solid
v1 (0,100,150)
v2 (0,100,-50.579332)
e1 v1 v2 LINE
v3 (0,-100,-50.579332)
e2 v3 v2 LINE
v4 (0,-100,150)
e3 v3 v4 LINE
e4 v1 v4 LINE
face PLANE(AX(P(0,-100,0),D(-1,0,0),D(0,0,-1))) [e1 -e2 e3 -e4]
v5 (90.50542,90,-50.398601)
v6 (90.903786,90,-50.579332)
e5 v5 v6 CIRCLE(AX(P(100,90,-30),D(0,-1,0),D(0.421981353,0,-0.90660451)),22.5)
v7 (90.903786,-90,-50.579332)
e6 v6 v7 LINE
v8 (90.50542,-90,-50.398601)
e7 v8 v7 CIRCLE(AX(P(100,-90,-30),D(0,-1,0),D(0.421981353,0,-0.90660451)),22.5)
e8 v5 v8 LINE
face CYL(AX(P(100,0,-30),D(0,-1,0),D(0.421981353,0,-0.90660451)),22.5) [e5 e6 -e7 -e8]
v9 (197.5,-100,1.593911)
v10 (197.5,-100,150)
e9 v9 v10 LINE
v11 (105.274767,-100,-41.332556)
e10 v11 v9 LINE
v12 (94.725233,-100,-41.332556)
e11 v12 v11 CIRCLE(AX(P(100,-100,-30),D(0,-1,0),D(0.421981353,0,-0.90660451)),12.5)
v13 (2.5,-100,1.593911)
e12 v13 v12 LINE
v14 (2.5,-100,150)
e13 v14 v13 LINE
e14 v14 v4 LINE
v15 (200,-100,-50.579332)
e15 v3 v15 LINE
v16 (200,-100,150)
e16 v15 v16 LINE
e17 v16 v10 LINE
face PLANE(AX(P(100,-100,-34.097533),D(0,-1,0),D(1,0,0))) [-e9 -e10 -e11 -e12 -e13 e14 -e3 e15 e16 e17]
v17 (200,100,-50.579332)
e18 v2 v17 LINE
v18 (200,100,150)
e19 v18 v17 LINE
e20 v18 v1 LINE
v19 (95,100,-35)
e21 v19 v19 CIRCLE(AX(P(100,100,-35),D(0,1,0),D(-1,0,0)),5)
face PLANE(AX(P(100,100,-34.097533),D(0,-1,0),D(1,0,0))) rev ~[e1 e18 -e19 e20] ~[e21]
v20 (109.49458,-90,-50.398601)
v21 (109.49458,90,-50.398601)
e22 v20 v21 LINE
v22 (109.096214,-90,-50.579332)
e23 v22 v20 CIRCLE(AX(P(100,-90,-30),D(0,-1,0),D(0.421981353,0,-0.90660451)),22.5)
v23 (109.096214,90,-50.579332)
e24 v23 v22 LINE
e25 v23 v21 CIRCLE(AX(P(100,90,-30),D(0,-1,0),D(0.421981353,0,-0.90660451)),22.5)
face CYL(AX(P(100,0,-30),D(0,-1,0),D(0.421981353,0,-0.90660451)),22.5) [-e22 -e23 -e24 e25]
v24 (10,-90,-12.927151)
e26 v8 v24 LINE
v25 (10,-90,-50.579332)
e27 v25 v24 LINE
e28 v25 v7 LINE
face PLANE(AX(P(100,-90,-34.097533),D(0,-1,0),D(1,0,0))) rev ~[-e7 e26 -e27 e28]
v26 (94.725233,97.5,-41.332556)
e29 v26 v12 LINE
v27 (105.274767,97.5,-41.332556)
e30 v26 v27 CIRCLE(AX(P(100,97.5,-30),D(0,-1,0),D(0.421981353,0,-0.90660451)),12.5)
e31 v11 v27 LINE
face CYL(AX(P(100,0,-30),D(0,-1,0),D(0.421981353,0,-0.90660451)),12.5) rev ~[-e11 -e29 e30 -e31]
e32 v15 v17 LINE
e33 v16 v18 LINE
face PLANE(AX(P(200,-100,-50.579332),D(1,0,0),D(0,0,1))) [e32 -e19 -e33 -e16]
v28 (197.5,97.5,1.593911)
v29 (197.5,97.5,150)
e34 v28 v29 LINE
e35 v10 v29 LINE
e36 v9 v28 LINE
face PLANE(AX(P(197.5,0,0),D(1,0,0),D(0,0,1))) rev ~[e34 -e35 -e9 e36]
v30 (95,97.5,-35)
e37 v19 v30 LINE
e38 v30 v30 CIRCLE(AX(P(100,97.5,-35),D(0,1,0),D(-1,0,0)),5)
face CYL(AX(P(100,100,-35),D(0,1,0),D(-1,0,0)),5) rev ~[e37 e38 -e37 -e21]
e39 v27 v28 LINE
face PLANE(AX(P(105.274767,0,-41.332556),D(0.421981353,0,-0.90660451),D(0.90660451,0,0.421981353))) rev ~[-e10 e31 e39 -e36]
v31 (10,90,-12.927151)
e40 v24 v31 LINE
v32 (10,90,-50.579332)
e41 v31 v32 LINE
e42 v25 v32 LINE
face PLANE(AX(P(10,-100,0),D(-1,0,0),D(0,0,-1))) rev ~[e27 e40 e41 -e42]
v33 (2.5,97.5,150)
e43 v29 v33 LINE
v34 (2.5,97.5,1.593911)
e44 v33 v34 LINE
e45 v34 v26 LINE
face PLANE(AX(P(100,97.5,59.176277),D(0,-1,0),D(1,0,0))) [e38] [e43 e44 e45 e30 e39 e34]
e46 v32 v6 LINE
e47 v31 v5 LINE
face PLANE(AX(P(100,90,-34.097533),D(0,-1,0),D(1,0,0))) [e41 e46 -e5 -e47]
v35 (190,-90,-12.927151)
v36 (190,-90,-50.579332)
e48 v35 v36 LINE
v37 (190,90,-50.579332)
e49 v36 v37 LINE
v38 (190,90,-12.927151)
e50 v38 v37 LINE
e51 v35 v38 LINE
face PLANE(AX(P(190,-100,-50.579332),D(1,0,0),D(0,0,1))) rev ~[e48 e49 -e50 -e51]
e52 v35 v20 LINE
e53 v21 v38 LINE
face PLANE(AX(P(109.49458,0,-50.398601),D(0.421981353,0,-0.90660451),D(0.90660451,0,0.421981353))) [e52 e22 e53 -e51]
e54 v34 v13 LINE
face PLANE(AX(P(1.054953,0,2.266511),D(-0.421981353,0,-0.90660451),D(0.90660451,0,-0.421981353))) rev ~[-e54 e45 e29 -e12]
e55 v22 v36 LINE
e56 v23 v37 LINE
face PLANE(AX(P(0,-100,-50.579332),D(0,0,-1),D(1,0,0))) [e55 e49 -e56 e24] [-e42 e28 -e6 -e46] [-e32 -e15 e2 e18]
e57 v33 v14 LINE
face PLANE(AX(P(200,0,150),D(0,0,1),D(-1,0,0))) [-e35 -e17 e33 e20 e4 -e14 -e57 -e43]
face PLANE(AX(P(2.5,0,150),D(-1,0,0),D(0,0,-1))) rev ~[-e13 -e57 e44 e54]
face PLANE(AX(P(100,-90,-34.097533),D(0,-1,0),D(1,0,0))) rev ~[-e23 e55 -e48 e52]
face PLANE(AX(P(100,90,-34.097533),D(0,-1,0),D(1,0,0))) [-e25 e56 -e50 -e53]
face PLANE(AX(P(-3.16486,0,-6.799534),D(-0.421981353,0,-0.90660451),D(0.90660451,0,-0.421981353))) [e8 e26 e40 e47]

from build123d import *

# Parameters (mm, degrees)
F1_DEPTH     = 100
F2_T         = -2.5
F3_R         = 5
F4_DEPTH     = 200.001
F6_DEPTH     = 200
F7_T         = 10
F7_T3_DEPTH  = 168.4060893131
F7_T5_DEPTH  = 121.7259809119
F7_T7_DEPTH  = 121.7259809119
F7_T9_DEPTH  = 217.5
F7_T12_ANGLE = 49.9194838504


# Not quite as in the source:
# - a shell that OpenCascade refuses in one call is made with other operations: the cavity is built on its own and cut out


with BuildPart() as f1:
    # F0 (on Front) → F1 (new body, symmetric)
    with BuildSketch(Plane.XZ):
        with BuildLine():
            Line((200, 150), (0, 150))
            Line((0, 150), (0, 0))
            Line((0, 0), (93.6702797046, -43.5990676512))
            ThreePointArc((93.6702797046, -43.5990676512), (91.9360618935, -17.3519605387), (115, -30))
            ThreePointArc((115, -30), (112.6480394613, -38.0639381065), (106.3297202954, -43.5990676512))
            Line((106.3297202954, -43.5990676512), (200, 0))
            Line((200, 0), (200, 150))
        make_face()
        with BuildLine():
            ThreePointArc((115, -30), (91.9360618935, -17.3519605387), (93.6702797046, -43.5990676512))
            ThreePointArc((93.6702797046, -43.5990676512), (100, -45), (106.3297202954, -43.5990676512))
            ThreePointArc((106.3297202954, -43.5990676512), (112.6480394613, -38.0639381065), (115, -30))
        make_face()
    extrude(amount=F1_DEPTH, both=True)

    # F2
    f2_openings = [f1.faces().sort_by_distance(p)[0] for p in [
        (100, -100, 62.86367),
        (100, 0, 150),
    ]]
    offset(amount=F2_T, openings=f2_openings)

    # F3 (on face) → F4 (cut, through all)
    with BuildSketch(Plane(origin=(0, 100, 0), x_dir=(-1, 0, 0), z_dir=(0, 1, 0))):
        with Locations((-100, -35)):
            Circle(F3_R)
    extrude(amount=-F4_DEPTH, mode=Mode.SUBTRACT)

    # F5 (on face) → F6 (join)
    with BuildSketch(Plane.XZ.offset(100)):
        with BuildLine():
            Line((93.6702797046, -43.5990676512), (0, 0))
            Line((0, 0), (0, -50.5793318152))
            Line((0, -50.5793318152), (200, -50.5793318152))
            Line((200, -50.5793318152), (200, 0))
            Line((200, 0), (106.3297202954, -43.5990676512))
            ThreePointArc((106.3297202954, -43.5990676512), (103.2414491537, -44.64557979), (100, -45))
            ThreePointArc((100, -45), (96.7585508463, -44.64557979), (93.6702797046, -43.5990676512))
        make_face()
    extrude(amount=-F6_DEPTH)

    # F7: shell of thickness 10, made by hand


with BuildPart() as f7_core1:
    # F7_t2: copy of F1
    add(f1.part)

    # the walls: a layer under each face that stays
    f7_faces = [f7_core1.faces().sort_by_distance(p)[0] for p in [
        (200, 0, 49.7103340924),
        (100, 100, 49.7103340924),
        (105, 98.75, -35),
        (100, 97.5, 53.75),
        (100, -1.25, -42.5),
        (48.6126165436, -1.25, -19.8693228445),
        (151.3873834564, -1.25, -19.8693228445),
        (2.5, -1.25, 75.7969553435),
        (197.5, -1.25, 75.7969553435),
        (0, 0, 49.7103340924),
        (33.3333333333, -100, -17.1494431794),
        (31.25, 97.5308641975, 150),
    ]]
    thicken(f7_faces, amount=-F7_T, mode=Mode.SUBTRACT)

    # F7_s4 → F7_t3 (cut)
    with BuildSketch(Plane.XY.offset(-8.4060893131)):
        Polygon((197.4, 97.4), (197.5, 107.5), (207.5, 107.5), (207.5, 97.5), align=None)
        Polygon((2.6, 97.4), (2.5, 107.5), (-7.5, 107.5), (-7.5, 97.5), align=None)
    extrude(amount=F7_T3_DEPTH, mode=Mode.SUBTRACT)

    # F7_s6 → F7_t5 (cut)
    with BuildSketch(Plane(origin=(61.6500227345, 0, 28.695158383), x_dir=(0, 1, 0), z_dir=(0.9066045101, 0, 0.421981353))):
        Polygon((97.4, -81.7962706049), (107.5, -81.8962706049), (107.5, -91.8962706049), (97.5, -91.8962706049), align=None)
    extrude(amount=F7_T5_DEPTH, mode=Mode.SUBTRACT)

    # F7_s8 → F7_t7 (cut)
    with BuildSketch(Plane(origin=(-7.6209984834, 0, 3.547212942), x_dir=(0, 1, 0), z_dir=(0.9066045101, 0, -0.421981353))):
        Polygon((97.4, 2.6), (107.5, 2.5), (107.5, -7.5), (97.5, -7.5), align=None)
    extrude(amount=F7_T7_DEPTH, mode=Mode.SUBTRACT)

    # F7_s10 → F7_t9 (cut)
    with BuildSketch(Plane.XZ.offset(-107.5)):
        Polygon((2.6421981353, 1.6845711379), (-1.7198135302, -7.4721344139), (-7.5, -4.7817320608), (-7.5, 1.5939106869), align=None)
        Polygon((197.3578018647, 1.6845711379), (201.7198135302, -7.4721344139), (207.5, -4.7817320608), (207.5, 1.5939106869), align=None)
    extrude(amount=F7_T9_DEPTH, mode=Mode.SUBTRACT)

    # F7_s11 → F7_t12 (revolve, cut)
    with BuildSketch(Plane(origin=(93.6702797046, 0, -43.5990676512), x_dir=(0, 1, 0), z_dir=(-0.9066045101, 0, 0.421981353))):
        Polygon((97.4, -2.6), (107.5, -2.5), (107.5, 7.5), (97.5, 7.5), align=None)
    revolve(axis=Axis((100, 97.5, -30), (0, -1, 0)), revolution_arc=F7_T12_ANGLE, mode=Mode.SUBTRACT)


with BuildPart() as f1_1:
    add(f1.part)

    # what is left inside the walls is the cavity
    f7_cavity = [f7_core1.part.solids().sort_by_distance(p)[0] for p in [
        (149.789488, 30, -31.753537),
        (50.210512, 30, -31.753537),
    ]]
    add(f7_cavity, mode=Mode.SUBTRACT)


solid = f1_1.part
